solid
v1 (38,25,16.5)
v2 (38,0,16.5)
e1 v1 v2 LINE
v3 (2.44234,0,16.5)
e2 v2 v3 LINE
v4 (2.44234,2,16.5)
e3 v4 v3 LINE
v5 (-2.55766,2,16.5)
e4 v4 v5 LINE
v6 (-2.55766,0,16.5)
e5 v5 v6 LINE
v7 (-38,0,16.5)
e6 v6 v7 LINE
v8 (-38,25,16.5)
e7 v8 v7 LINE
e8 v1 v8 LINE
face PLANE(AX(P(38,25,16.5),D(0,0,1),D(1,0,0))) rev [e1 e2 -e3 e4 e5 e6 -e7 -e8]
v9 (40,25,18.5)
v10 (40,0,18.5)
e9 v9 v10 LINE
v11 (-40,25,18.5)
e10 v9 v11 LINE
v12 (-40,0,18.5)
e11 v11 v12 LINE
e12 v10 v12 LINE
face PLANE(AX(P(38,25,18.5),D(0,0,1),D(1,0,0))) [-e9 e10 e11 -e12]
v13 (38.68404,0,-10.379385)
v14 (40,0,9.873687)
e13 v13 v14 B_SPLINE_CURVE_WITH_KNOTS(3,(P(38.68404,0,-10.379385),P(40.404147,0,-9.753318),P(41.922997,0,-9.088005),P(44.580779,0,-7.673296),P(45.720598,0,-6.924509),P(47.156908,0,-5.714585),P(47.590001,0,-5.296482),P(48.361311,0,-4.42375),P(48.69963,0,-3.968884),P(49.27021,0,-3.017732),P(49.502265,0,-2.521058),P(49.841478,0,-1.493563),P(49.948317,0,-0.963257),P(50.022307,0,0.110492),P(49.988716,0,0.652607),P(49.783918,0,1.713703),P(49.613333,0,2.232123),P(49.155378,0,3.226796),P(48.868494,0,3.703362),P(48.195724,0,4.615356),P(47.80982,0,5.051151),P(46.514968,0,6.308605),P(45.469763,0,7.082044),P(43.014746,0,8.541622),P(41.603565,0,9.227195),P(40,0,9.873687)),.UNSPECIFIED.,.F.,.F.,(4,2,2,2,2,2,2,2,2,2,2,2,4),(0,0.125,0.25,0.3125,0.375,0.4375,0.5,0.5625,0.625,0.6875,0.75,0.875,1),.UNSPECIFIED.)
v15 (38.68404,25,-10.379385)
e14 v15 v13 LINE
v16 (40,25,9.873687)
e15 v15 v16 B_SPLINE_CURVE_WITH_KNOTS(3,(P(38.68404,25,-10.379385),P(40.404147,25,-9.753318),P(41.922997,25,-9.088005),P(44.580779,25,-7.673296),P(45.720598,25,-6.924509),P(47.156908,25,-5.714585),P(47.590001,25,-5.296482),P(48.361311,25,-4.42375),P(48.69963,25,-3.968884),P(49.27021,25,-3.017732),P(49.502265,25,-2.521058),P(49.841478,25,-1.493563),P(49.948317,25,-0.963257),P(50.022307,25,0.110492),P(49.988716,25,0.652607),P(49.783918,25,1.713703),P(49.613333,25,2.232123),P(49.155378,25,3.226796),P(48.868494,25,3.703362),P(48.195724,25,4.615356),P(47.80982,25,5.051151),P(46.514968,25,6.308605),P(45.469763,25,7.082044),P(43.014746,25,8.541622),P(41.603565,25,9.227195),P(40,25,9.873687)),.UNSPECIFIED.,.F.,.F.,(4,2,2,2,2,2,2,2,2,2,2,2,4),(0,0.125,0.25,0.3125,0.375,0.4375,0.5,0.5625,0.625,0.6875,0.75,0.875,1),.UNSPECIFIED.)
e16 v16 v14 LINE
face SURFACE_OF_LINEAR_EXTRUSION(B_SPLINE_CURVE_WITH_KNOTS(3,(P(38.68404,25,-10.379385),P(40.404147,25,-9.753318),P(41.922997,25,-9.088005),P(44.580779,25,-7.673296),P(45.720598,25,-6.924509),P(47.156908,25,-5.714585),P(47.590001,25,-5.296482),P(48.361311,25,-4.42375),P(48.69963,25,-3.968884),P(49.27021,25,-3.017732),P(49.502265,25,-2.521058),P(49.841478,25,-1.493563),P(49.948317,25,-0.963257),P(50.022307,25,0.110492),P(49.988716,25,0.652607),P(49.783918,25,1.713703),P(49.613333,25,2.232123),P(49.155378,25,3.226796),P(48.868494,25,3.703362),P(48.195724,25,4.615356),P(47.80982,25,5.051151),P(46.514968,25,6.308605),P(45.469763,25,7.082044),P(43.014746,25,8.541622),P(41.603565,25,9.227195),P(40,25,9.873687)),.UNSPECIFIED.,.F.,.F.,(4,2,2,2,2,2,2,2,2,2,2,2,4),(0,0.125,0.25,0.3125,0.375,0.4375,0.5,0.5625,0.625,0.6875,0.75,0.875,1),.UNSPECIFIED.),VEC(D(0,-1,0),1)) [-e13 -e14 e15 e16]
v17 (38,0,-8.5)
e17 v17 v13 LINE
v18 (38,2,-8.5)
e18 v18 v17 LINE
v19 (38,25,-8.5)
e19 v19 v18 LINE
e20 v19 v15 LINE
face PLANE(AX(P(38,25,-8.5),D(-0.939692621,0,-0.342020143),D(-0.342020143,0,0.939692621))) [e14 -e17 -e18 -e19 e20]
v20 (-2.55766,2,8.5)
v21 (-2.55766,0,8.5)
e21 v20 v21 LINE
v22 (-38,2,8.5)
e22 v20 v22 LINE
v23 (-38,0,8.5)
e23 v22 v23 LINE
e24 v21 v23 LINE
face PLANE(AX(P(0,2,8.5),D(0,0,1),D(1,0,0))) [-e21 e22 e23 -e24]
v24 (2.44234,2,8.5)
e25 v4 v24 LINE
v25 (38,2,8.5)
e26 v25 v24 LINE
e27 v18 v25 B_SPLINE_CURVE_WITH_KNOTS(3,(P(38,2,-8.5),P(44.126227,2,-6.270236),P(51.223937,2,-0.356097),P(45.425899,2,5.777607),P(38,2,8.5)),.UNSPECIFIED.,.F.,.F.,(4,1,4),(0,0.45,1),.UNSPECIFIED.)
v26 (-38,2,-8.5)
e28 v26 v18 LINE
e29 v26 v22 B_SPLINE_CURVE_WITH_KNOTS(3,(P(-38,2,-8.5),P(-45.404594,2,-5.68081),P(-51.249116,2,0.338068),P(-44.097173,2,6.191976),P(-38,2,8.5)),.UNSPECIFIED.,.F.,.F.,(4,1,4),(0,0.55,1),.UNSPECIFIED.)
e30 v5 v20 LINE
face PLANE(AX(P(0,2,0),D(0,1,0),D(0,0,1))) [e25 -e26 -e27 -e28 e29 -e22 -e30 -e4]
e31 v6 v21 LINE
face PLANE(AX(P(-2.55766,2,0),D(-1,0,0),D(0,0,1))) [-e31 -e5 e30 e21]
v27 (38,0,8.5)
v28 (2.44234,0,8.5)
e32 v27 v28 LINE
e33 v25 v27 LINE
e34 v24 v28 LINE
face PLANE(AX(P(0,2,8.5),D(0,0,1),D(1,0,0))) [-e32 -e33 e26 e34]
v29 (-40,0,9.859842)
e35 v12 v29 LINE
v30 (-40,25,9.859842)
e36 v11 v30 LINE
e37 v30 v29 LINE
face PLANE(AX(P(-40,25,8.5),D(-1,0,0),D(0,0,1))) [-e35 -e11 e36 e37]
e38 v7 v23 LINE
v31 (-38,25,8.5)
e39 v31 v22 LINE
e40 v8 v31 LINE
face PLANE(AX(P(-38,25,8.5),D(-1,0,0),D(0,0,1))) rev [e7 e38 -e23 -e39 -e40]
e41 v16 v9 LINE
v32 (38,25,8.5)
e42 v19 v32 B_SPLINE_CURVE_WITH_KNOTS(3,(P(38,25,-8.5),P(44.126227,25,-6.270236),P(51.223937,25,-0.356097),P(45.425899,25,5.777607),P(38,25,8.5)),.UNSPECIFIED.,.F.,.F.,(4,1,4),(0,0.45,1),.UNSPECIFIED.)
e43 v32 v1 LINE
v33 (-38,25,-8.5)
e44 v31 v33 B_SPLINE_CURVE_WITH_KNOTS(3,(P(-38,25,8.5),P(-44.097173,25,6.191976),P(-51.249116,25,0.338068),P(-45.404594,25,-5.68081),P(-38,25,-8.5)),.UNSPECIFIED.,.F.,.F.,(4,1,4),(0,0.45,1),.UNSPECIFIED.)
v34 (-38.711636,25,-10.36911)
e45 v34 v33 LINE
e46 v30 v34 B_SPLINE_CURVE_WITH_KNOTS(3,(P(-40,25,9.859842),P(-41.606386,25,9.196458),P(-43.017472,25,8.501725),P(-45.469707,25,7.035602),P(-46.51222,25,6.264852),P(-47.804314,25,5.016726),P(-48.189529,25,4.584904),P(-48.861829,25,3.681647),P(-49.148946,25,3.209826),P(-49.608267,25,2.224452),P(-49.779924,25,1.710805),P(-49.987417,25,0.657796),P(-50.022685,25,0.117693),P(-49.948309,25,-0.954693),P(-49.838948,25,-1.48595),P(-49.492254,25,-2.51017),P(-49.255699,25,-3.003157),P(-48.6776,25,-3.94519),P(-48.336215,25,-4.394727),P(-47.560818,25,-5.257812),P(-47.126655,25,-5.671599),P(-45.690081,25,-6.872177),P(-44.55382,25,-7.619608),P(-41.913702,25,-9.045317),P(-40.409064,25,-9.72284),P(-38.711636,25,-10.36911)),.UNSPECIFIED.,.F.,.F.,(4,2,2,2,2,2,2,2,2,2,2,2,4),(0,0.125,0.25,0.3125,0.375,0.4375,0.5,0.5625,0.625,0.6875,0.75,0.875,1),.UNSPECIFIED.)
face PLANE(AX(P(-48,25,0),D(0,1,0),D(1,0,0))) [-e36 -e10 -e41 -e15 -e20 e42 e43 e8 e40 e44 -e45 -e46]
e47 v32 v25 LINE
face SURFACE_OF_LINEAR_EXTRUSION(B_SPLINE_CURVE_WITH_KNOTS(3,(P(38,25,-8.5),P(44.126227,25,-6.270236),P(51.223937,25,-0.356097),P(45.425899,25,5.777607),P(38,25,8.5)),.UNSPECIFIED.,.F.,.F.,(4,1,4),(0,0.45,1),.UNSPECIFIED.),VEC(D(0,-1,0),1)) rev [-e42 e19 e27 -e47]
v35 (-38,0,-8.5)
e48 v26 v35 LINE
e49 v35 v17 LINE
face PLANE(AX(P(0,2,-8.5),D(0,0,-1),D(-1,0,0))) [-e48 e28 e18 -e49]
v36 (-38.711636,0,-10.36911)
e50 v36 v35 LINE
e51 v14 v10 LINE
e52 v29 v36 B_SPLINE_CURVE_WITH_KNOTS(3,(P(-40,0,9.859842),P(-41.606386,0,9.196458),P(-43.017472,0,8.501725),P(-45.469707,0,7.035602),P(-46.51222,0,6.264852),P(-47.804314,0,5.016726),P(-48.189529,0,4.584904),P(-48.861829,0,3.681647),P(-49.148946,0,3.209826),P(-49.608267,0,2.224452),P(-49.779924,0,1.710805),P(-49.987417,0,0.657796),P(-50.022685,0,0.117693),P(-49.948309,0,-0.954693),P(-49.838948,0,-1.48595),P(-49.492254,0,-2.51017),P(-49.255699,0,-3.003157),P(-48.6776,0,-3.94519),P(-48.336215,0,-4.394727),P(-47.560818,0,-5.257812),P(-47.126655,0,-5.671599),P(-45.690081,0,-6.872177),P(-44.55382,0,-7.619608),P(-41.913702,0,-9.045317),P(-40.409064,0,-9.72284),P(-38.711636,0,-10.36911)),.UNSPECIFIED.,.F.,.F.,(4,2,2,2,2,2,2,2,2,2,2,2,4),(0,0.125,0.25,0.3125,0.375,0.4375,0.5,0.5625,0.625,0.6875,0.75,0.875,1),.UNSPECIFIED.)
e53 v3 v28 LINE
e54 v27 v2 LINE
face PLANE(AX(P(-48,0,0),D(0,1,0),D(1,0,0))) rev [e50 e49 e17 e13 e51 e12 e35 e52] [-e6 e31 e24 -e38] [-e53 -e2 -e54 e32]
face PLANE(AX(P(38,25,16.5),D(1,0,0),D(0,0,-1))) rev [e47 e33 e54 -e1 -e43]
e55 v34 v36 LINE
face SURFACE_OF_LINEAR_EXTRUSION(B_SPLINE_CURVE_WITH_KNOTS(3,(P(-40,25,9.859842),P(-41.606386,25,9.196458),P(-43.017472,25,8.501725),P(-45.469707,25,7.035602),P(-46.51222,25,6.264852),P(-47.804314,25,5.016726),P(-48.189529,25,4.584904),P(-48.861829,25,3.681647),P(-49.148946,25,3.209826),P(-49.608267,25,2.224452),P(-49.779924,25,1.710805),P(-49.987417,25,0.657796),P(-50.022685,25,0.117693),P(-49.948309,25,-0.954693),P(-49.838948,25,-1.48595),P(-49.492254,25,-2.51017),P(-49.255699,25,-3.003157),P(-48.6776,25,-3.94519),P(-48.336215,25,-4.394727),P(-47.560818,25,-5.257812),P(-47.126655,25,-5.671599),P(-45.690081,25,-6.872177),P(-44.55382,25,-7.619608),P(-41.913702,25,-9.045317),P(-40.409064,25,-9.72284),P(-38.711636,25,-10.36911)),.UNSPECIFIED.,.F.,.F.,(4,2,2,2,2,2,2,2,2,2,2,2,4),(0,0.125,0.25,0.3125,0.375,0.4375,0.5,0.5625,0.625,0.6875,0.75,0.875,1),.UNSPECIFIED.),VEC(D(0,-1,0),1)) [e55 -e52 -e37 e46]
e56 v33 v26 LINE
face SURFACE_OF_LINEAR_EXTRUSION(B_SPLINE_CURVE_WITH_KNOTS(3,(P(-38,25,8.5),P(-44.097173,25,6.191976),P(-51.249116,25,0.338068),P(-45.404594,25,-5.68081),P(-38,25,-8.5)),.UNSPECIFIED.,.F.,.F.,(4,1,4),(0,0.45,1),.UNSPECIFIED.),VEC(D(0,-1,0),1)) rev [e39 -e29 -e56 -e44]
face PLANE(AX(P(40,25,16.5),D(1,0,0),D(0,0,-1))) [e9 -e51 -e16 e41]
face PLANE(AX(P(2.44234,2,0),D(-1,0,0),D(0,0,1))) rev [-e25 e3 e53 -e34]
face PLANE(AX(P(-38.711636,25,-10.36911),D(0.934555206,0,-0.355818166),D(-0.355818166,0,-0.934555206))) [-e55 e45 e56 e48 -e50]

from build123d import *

# Parameters (mm, degrees)
EXTRUDE_THIN1_DEPTH = 25
SKETCH1_4_W         = 5
SKETCH1_4_H         = 8
BOSS_EXTRUDE1_DEPTH = 2


# Read off the part's stored shape, not the designer's step: Extrude-Thin1
with BuildPart() as part:
    # Extrude-Thin1 outline → Extrude-Thin1 (new body)
    with BuildSketch(Plane(origin=(0, 0, 0), x_dir=(1, 0, 0), z_dir=(0, 1, 0))):
        with BuildLine():
            Line((-38, -16.5), (-38, -8.5))
            add(Edge.make_bspline(
                [(-38, -8.5), (-44.097173442, -6.191975733), (-51.24911635, -0.338068019), (-45.404593858, 5.680809666), (-38, 8.5)],
                knots=[0, 0, 0, 0, 0.45, 1, 1, 1, 1], degree=3))
            Line((-38, 8.5), (-38.711636331, 10.369110412))
            add(Edge.make_bspline(
                [(-40, -9.859841794), (-41.606386453, -9.196458265), (-43.017472016, -8.501725084), (-45.469707437, -7.035602306), (-46.512220325, -6.264852114), (-47.804314217, -5.016726081), (-48.189528627, -4.584904063), (-48.861828962, -3.681646539), (-49.148945908, -3.209825558), (-49.608266758, -2.224452325), (-49.779923805, -1.710805438), (-49.987416601, -0.657795935), (-50.022684998, -0.117692843), (-49.948308777, 0.954692848), (-49.838948343, 1.485949966), (-49.492254198, 2.510170013), (-49.255698689, 3.003157429), (-48.677599503, 3.945189967), (-48.336215051, 4.394726597), (-47.560818188, 5.257811894), (-47.12665517, 5.671599025), (-45.690080991, 6.872176624), (-44.553820309, 7.619607901), (-41.913701573, 9.045316851), (-40.409063551, 9.722839934), (-38.711636331, 10.369110412)],
                knots=[0, 0, 0, 0, 0.125, 0.125, 0.25, 0.25, 0.3125, 0.3125, 0.375, 0.375, 0.4375, 0.4375, 0.5, 0.5, 0.5625, 0.5625, 0.625, 0.625, 0.6875, 0.6875, 0.75, 0.75, 0.875, 0.875, 1, 1, 1, 1], degree=3))
            Line((-40, -9.859841794), (-40, -18.5))
            Line((-40, -18.5), (40, -18.5))
            Line((40, -18.5), (40, -9.873686568))
            add(Edge.make_bspline(
                [(38.684040287, 10.379385242), (40.404146523, 9.753317772), (41.922997097, 9.088004701), (44.580778609, 7.67329588), (45.720598061, 6.924508695), (47.156908421, 5.714585478), (47.590001398, 5.296481601), (48.361311267, 4.423750332), (48.699629675, 3.968883794), (49.270210276, 3.017732284), (49.502265384, 2.521057808), (49.841478111, 1.493563088), (49.948317052, 0.963257165), (50.022307254, -0.110491836), (49.98871569, -0.652606556), (49.783918004, -1.713702721), (49.613332553, -2.232123006), (49.155378033, -3.226795657), (48.868494073, -3.703362334), (48.19572387, -4.615356392), (47.809819507, -5.05115076), (46.514967687, -6.308605239), (45.469763356, -7.082043918), (43.014746143, -8.541621876), (41.603565288, -9.227195017), (40, -9.873686568)],
                knots=[0, 0, 0, 0, 0.125, 0.125, 0.25, 0.25, 0.3125, 0.3125, 0.375, 0.375, 0.4375, 0.4375, 0.5, 0.5, 0.5625, 0.5625, 0.625, 0.625, 0.6875, 0.6875, 0.75, 0.75, 0.875, 0.875, 1, 1, 1, 1], degree=3))
            Line((38.684040287, 10.379385242), (38, 8.5))
            add(Edge.make_bspline(
                [(38, 8.5), (44.126226569, 6.270235881), (51.223936974, 0.356097076), (45.425899484, -5.777606597), (38, -8.5)],
                knots=[0, 0, 0, 0, 0.45, 1, 1, 1, 1], degree=3))
            Line((38, -8.5), (38, -16.5))
            Line((38, -16.5), (-38, -16.5))
        make_face()
    extrude(amount=EXTRUDE_THIN1_DEPTH)

    # Sketch1<4> → Boss-Extrude1 (add)
    with BuildSketch(Plane(origin=(0, 0, 0), x_dir=(1, 0, 0), z_dir=(0, 1, 0))):
        with BuildLine():
            add(Edge.make_bspline(
                [(38, 8.5), (44.126226569, 6.270235881), (51.223936974, 0.356097076), (45.425899484, -5.777606597), (38, -8.5)],
                knots=[0, 0, 0, 0, 0.45, 1, 1, 1, 1], degree=3))
            Line((38, -8.5), (-38, -8.5))
            add(Edge.make_bspline(
                [(-38, 8.5), (-45.404593858, 5.680809666), (-51.24911635, -0.338068019), (-44.097173442, -6.191975733), (-38, -8.5)],
                knots=[0, 0, 0, 0, 0.55, 1, 1, 1, 1], degree=3))
            Line((-38, 8.5), (38, 8.5))
        make_face()
        with Locations((-0.057660248, -12.5)):
            Rectangle(SKETCH1_4_W, SKETCH1_4_H)
    extrude(amount=BOSS_EXTRUDE1_DEPTH)


solid = part.part
